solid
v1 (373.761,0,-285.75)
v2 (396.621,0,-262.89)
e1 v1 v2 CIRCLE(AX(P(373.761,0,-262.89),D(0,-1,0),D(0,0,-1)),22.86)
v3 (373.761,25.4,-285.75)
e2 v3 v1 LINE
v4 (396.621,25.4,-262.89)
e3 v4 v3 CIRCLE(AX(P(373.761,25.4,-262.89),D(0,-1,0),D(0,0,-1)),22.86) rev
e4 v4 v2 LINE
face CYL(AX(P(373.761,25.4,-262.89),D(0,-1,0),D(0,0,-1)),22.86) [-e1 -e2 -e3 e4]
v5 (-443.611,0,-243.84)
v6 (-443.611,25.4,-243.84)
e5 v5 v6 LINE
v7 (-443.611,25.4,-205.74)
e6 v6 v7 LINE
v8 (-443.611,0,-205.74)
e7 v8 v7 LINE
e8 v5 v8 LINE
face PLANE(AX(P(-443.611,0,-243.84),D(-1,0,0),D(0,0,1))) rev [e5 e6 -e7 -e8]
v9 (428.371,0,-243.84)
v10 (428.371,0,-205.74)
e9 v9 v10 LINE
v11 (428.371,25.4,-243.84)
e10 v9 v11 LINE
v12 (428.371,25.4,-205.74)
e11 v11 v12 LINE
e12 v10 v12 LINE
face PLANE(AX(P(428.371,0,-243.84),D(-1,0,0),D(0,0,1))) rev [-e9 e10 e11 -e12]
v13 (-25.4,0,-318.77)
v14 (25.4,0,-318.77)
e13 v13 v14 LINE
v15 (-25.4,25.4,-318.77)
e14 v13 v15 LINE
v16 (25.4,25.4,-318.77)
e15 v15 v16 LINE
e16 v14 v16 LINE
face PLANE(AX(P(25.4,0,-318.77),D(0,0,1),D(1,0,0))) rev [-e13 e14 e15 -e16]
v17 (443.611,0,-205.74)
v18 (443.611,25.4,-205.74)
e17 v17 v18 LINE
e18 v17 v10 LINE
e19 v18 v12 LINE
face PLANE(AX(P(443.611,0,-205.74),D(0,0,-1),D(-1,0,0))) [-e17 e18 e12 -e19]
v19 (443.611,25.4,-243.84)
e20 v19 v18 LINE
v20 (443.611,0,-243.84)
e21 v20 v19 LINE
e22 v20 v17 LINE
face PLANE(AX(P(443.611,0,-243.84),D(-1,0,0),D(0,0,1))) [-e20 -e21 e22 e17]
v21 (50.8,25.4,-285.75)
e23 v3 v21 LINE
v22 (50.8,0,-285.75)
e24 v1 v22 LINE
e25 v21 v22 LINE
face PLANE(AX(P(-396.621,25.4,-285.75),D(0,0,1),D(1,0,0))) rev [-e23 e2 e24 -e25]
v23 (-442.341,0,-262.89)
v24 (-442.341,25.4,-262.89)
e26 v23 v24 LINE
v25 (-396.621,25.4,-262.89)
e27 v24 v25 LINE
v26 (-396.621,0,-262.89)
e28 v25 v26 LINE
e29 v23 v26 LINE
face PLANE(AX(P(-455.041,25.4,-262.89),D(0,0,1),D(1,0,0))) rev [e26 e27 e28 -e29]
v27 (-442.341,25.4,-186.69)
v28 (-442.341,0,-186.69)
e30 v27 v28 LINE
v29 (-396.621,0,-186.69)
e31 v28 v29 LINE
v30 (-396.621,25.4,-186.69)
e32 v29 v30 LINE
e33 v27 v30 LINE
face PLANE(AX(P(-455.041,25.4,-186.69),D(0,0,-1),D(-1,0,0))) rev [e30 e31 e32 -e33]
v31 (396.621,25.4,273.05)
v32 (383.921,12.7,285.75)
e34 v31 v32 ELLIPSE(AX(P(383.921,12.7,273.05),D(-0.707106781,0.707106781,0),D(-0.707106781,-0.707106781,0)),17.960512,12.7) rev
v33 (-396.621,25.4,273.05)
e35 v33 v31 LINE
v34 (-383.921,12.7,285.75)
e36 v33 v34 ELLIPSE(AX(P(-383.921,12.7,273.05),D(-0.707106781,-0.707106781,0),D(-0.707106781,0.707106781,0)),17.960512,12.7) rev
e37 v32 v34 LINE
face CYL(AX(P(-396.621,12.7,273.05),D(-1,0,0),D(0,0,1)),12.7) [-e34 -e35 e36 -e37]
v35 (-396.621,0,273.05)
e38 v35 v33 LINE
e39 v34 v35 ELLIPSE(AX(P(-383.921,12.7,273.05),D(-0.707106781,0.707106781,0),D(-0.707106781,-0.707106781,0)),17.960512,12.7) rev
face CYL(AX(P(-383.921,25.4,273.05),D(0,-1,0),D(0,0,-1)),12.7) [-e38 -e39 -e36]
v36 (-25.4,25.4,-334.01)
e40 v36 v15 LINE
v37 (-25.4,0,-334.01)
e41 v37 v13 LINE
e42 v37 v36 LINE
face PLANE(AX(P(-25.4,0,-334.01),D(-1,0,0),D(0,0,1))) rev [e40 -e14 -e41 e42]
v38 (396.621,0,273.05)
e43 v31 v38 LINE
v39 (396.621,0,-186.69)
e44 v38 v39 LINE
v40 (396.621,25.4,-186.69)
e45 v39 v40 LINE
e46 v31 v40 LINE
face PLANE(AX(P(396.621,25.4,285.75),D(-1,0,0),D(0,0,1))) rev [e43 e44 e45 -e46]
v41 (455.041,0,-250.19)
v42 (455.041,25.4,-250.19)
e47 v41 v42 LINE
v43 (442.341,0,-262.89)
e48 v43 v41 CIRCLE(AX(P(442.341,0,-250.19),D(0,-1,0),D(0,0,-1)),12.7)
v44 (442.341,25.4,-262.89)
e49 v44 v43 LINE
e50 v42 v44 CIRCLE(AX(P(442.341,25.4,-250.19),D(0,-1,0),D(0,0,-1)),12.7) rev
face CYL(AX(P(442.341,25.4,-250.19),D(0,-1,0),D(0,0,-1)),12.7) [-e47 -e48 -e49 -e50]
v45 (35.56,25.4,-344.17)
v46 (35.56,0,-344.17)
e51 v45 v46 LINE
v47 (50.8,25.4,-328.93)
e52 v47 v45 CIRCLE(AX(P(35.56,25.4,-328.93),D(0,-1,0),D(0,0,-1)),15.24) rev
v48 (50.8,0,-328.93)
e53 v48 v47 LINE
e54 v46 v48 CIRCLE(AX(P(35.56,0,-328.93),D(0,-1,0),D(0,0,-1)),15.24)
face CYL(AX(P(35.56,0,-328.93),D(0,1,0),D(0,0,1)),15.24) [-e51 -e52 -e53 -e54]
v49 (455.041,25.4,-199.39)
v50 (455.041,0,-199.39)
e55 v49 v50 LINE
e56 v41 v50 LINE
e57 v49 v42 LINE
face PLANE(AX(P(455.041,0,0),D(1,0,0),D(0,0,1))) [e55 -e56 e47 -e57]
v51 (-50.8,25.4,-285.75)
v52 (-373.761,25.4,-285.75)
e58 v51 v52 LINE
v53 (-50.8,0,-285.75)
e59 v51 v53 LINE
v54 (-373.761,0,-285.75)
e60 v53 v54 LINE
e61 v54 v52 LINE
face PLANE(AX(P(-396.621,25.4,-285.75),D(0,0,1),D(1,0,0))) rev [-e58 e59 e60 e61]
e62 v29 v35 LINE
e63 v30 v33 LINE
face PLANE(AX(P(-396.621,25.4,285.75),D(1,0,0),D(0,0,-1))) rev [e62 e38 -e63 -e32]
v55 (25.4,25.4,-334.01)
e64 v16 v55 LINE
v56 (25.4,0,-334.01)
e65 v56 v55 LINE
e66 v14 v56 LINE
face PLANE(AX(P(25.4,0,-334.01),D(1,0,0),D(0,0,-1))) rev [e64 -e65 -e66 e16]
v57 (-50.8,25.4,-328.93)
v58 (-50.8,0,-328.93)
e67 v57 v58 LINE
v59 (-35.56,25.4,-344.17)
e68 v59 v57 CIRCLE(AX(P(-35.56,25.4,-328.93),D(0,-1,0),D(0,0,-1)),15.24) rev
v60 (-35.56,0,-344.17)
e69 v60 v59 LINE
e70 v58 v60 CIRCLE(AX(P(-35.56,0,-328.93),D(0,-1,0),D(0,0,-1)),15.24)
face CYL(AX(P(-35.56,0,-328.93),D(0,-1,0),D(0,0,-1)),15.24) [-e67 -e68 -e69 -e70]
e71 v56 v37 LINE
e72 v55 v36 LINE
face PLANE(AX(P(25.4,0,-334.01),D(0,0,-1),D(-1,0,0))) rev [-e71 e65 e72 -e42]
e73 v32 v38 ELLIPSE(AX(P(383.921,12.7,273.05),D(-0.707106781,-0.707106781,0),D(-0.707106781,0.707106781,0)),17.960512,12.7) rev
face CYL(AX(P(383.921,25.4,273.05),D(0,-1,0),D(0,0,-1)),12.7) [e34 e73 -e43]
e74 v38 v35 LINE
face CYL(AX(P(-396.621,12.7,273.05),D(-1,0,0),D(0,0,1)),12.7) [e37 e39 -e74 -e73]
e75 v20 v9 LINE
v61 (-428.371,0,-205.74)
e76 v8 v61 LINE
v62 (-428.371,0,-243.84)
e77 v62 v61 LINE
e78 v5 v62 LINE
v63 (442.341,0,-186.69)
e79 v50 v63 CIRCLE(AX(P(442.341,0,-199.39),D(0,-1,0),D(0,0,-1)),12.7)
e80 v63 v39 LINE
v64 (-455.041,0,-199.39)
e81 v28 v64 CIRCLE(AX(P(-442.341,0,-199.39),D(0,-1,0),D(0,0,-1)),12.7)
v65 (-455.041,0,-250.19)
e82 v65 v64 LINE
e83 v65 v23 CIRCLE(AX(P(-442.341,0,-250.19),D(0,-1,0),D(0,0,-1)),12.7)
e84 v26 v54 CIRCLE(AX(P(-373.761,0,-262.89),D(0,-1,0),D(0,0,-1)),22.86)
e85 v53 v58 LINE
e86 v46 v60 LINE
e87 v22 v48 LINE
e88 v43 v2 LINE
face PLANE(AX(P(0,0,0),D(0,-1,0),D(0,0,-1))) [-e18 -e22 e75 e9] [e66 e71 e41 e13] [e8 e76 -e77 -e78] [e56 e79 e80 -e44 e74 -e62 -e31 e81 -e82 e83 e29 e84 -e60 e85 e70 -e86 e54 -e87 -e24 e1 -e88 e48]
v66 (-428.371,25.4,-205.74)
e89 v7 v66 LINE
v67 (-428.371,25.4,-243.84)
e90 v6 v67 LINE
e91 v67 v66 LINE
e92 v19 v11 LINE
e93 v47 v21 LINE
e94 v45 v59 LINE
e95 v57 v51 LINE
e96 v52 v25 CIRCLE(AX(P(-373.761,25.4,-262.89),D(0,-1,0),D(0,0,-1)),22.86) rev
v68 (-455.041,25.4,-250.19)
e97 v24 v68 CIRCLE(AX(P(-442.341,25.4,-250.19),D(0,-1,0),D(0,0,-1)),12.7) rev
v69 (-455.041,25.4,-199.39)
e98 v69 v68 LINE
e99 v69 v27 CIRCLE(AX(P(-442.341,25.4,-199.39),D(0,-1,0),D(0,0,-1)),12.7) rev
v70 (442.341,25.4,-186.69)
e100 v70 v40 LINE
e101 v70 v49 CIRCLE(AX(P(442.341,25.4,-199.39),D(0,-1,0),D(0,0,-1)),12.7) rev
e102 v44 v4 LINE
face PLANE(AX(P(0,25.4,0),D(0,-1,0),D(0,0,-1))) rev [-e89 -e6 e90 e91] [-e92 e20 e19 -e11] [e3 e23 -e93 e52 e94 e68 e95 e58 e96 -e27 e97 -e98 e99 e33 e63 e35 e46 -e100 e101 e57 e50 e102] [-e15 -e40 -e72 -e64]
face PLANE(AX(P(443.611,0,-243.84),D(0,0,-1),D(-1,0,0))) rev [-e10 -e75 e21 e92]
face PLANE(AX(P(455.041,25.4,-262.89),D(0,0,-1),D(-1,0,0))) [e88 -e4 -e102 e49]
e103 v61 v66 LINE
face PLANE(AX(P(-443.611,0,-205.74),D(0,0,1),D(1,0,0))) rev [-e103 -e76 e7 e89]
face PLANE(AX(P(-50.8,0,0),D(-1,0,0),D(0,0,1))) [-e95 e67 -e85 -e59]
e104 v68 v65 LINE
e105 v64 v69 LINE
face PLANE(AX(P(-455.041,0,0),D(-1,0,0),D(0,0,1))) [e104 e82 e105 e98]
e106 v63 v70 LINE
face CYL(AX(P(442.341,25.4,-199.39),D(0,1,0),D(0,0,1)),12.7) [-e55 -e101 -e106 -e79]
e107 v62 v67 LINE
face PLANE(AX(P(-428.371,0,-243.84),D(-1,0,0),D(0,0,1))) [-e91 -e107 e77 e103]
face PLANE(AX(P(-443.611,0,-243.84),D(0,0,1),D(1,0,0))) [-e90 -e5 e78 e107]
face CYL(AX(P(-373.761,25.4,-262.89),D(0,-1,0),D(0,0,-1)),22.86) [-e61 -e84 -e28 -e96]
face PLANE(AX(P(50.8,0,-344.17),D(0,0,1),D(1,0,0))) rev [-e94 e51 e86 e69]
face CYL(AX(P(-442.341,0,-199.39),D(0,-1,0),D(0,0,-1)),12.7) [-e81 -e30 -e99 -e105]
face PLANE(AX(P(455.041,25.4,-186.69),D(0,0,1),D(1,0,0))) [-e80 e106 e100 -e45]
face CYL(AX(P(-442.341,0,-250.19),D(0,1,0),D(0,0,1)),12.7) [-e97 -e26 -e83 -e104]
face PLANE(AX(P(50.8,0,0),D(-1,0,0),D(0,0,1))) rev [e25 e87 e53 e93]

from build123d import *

# Parameters (mm, degrees)
SKETCH1_W            = 793.242
SKETCH1_H            = 571.5
BOSS_EXTRUDE1_DEPTH  = 25.4
FILLET1_R            = 17.78
SKETCH2_W            = 76.2
SKETCH2_H            = 25.4
BOSS_EXTRUDE2_DEPTH  = 58.42
FILLET2_R            = 12.7
SKETCH3_W            = 15.24
SKETCH3_H            = 38.1
CUT_EXTRUDE1_DEPTH   = 538.922423943
FILLET2_OF_MIRROR2_R = 12.7
SKETCH4_W            = 58.42
SKETCH4_H            = 25.4
BOSS_EXTRUDE3_DEPTH  = 50.8
FILLET3_R            = 22.86
FILLET4_R            = 22.86
SKETCH5_W            = 50.8
SKETCH5_H            = 15.24
CUT_EXTRUDE2_DEPTH   = 572.104596883
FILLET7_R            = 15.24
FILLET8_R            = 12.7


with BuildPart() as part:
    # Sketch1 → Boss-Extrude1 (new body)
    with BuildSketch(Plane(origin=(0, 0, 0), x_dir=(1, 0, 0), z_dir=(0, 1, 0))):
        Rectangle(SKETCH1_W, SKETCH1_H)
    boss_extrude1 = extrude(amount=BOSS_EXTRUDE1_DEPTH)

    # Fillet1
    fillet1_edges = [part.edges().sort_by_distance(p)[0] for p in [
        (0, 25.4, 285.75),
        (396.621, 12.7, 285.75),
        (-396.621, 12.7, 285.75),
        (-396.621, 12.7, -285.75),
        (396.621, 12.7, -285.75),
    ]]
    fillet(fillet1_edges, radius=FILLET1_R)

    # Sketch2 → Boss-Extrude2 (add)
    with BuildSketch(Plane.ZY.offset(396.621)):
        with Locations((-224.79, 12.7)):
            Rectangle(SKETCH2_W, SKETCH2_H)
    boss_extrude2 = extrude(amount=BOSS_EXTRUDE2_DEPTH)

    # Fillet2
    fillet2_edges = [part.edges().sort_by_distance(p)[0] for p in [
        (-455.041, 12.7, -262.89),
        (-455.041, 12.7, -186.69),
    ]]
    fillet(fillet2_edges, radius=FILLET2_R)

    # Sketch3 → Cut-Extrude1 (cut, through all)
    with BuildSketch(Plane(origin=(0, 25.4, 0), x_dir=(1, 0, 0), z_dir=(0, 1, 0))):
        with Locations((-435.991, 224.79)):
            Rectangle(SKETCH3_W, SKETCH3_H)
    cut_extrude1 = extrude(amount=-CUT_EXTRUDE1_DEPTH, mode=Mode.SUBTRACT)

    # Mirror2: Boss-Extrude1, Boss-Extrude2, Cut-Extrude1 across plane
    add(boss_extrude1.mirror(Plane(origin=(0, 0, 0), x_dir=(0, 0, 1), z_dir=(1, 0, 0))))
    add(boss_extrude2.mirror(Plane(origin=(0, 0, 0), x_dir=(0, 0, 1), z_dir=(1, 0, 0))))
    add(cut_extrude1.mirror(Plane(origin=(0, 0, 0), x_dir=(0, 0, 1), z_dir=(1, 0, 0))), mode=Mode.SUBTRACT)

    # Fillet2 of Mirror2
    fillet2_of_mirror2_edges = [part.edges().sort_by_distance(p)[0] for p in [
        (455.041, 12.7, -262.89),
        (455.041, 12.7, -186.69),
    ]]
    fillet(fillet2_of_mirror2_edges, radius=FILLET2_OF_MIRROR2_R)

    # Sketch4 → Boss-Extrude3 (add, symmetric)
    with BuildSketch(Plane(origin=(0, 0, 0), x_dir=(0, 0, -1), z_dir=(1, 0, 0))):
        with Locations((314.96, 12.7)):
            Rectangle(SKETCH4_W, SKETCH4_H)
    extrude(amount=BOSS_EXTRUDE3_DEPTH, both=True)

    # Fillet3
    fillet3_edges = [part.edges().sort_by_distance(p)[0] for p in [
        (396.621, 12.7, -285.75),
    ]]
    fillet(fillet3_edges, radius=FILLET3_R - 0.0001)  # a hair under: the kernel refuses the full size

    # Fillet4
    fillet4_edges = [part.edges().sort_by_distance(p)[0] for p in [
        (-396.621, 12.7, -285.75),
    ]]
    fillet(fillet4_edges, radius=FILLET4_R - 0.0001)  # a hair under: the kernel refuses the full size

    # Sketch5 → Cut-Extrude2 (cut, through all)
    with BuildSketch(Plane(origin=(0, 25.4, 0), x_dir=(1, 0, 0), z_dir=(0, 1, 0))):
        with Locations((0, 326.39)):
            Rectangle(SKETCH5_W, SKETCH5_H)
    extrude(amount=-CUT_EXTRUDE2_DEPTH, mode=Mode.SUBTRACT)

    # Fillet7
    fillet7_edges = [part.edges().sort_by_distance(p)[0] for p in [
        (-50.8, 12.7, -344.17),
        (50.8, 12.7, -344.17),
    ]]
    fillet(fillet7_edges, radius=FILLET7_R)

    # Fillet8
    fillet8_edges = [part.edges().sort_by_distance(p)[0] for p in [
        (0, 0, 285.75),
        (0, 25.4, 285.75),
        (-396.621, 12.7, 285.75),
        (396.621, 12.7, 285.75),
    ]]
    fillet(fillet8_edges, radius=FILLET8_R - 0.0001)  # a hair under: the kernel refuses the full size


solid = part.part
